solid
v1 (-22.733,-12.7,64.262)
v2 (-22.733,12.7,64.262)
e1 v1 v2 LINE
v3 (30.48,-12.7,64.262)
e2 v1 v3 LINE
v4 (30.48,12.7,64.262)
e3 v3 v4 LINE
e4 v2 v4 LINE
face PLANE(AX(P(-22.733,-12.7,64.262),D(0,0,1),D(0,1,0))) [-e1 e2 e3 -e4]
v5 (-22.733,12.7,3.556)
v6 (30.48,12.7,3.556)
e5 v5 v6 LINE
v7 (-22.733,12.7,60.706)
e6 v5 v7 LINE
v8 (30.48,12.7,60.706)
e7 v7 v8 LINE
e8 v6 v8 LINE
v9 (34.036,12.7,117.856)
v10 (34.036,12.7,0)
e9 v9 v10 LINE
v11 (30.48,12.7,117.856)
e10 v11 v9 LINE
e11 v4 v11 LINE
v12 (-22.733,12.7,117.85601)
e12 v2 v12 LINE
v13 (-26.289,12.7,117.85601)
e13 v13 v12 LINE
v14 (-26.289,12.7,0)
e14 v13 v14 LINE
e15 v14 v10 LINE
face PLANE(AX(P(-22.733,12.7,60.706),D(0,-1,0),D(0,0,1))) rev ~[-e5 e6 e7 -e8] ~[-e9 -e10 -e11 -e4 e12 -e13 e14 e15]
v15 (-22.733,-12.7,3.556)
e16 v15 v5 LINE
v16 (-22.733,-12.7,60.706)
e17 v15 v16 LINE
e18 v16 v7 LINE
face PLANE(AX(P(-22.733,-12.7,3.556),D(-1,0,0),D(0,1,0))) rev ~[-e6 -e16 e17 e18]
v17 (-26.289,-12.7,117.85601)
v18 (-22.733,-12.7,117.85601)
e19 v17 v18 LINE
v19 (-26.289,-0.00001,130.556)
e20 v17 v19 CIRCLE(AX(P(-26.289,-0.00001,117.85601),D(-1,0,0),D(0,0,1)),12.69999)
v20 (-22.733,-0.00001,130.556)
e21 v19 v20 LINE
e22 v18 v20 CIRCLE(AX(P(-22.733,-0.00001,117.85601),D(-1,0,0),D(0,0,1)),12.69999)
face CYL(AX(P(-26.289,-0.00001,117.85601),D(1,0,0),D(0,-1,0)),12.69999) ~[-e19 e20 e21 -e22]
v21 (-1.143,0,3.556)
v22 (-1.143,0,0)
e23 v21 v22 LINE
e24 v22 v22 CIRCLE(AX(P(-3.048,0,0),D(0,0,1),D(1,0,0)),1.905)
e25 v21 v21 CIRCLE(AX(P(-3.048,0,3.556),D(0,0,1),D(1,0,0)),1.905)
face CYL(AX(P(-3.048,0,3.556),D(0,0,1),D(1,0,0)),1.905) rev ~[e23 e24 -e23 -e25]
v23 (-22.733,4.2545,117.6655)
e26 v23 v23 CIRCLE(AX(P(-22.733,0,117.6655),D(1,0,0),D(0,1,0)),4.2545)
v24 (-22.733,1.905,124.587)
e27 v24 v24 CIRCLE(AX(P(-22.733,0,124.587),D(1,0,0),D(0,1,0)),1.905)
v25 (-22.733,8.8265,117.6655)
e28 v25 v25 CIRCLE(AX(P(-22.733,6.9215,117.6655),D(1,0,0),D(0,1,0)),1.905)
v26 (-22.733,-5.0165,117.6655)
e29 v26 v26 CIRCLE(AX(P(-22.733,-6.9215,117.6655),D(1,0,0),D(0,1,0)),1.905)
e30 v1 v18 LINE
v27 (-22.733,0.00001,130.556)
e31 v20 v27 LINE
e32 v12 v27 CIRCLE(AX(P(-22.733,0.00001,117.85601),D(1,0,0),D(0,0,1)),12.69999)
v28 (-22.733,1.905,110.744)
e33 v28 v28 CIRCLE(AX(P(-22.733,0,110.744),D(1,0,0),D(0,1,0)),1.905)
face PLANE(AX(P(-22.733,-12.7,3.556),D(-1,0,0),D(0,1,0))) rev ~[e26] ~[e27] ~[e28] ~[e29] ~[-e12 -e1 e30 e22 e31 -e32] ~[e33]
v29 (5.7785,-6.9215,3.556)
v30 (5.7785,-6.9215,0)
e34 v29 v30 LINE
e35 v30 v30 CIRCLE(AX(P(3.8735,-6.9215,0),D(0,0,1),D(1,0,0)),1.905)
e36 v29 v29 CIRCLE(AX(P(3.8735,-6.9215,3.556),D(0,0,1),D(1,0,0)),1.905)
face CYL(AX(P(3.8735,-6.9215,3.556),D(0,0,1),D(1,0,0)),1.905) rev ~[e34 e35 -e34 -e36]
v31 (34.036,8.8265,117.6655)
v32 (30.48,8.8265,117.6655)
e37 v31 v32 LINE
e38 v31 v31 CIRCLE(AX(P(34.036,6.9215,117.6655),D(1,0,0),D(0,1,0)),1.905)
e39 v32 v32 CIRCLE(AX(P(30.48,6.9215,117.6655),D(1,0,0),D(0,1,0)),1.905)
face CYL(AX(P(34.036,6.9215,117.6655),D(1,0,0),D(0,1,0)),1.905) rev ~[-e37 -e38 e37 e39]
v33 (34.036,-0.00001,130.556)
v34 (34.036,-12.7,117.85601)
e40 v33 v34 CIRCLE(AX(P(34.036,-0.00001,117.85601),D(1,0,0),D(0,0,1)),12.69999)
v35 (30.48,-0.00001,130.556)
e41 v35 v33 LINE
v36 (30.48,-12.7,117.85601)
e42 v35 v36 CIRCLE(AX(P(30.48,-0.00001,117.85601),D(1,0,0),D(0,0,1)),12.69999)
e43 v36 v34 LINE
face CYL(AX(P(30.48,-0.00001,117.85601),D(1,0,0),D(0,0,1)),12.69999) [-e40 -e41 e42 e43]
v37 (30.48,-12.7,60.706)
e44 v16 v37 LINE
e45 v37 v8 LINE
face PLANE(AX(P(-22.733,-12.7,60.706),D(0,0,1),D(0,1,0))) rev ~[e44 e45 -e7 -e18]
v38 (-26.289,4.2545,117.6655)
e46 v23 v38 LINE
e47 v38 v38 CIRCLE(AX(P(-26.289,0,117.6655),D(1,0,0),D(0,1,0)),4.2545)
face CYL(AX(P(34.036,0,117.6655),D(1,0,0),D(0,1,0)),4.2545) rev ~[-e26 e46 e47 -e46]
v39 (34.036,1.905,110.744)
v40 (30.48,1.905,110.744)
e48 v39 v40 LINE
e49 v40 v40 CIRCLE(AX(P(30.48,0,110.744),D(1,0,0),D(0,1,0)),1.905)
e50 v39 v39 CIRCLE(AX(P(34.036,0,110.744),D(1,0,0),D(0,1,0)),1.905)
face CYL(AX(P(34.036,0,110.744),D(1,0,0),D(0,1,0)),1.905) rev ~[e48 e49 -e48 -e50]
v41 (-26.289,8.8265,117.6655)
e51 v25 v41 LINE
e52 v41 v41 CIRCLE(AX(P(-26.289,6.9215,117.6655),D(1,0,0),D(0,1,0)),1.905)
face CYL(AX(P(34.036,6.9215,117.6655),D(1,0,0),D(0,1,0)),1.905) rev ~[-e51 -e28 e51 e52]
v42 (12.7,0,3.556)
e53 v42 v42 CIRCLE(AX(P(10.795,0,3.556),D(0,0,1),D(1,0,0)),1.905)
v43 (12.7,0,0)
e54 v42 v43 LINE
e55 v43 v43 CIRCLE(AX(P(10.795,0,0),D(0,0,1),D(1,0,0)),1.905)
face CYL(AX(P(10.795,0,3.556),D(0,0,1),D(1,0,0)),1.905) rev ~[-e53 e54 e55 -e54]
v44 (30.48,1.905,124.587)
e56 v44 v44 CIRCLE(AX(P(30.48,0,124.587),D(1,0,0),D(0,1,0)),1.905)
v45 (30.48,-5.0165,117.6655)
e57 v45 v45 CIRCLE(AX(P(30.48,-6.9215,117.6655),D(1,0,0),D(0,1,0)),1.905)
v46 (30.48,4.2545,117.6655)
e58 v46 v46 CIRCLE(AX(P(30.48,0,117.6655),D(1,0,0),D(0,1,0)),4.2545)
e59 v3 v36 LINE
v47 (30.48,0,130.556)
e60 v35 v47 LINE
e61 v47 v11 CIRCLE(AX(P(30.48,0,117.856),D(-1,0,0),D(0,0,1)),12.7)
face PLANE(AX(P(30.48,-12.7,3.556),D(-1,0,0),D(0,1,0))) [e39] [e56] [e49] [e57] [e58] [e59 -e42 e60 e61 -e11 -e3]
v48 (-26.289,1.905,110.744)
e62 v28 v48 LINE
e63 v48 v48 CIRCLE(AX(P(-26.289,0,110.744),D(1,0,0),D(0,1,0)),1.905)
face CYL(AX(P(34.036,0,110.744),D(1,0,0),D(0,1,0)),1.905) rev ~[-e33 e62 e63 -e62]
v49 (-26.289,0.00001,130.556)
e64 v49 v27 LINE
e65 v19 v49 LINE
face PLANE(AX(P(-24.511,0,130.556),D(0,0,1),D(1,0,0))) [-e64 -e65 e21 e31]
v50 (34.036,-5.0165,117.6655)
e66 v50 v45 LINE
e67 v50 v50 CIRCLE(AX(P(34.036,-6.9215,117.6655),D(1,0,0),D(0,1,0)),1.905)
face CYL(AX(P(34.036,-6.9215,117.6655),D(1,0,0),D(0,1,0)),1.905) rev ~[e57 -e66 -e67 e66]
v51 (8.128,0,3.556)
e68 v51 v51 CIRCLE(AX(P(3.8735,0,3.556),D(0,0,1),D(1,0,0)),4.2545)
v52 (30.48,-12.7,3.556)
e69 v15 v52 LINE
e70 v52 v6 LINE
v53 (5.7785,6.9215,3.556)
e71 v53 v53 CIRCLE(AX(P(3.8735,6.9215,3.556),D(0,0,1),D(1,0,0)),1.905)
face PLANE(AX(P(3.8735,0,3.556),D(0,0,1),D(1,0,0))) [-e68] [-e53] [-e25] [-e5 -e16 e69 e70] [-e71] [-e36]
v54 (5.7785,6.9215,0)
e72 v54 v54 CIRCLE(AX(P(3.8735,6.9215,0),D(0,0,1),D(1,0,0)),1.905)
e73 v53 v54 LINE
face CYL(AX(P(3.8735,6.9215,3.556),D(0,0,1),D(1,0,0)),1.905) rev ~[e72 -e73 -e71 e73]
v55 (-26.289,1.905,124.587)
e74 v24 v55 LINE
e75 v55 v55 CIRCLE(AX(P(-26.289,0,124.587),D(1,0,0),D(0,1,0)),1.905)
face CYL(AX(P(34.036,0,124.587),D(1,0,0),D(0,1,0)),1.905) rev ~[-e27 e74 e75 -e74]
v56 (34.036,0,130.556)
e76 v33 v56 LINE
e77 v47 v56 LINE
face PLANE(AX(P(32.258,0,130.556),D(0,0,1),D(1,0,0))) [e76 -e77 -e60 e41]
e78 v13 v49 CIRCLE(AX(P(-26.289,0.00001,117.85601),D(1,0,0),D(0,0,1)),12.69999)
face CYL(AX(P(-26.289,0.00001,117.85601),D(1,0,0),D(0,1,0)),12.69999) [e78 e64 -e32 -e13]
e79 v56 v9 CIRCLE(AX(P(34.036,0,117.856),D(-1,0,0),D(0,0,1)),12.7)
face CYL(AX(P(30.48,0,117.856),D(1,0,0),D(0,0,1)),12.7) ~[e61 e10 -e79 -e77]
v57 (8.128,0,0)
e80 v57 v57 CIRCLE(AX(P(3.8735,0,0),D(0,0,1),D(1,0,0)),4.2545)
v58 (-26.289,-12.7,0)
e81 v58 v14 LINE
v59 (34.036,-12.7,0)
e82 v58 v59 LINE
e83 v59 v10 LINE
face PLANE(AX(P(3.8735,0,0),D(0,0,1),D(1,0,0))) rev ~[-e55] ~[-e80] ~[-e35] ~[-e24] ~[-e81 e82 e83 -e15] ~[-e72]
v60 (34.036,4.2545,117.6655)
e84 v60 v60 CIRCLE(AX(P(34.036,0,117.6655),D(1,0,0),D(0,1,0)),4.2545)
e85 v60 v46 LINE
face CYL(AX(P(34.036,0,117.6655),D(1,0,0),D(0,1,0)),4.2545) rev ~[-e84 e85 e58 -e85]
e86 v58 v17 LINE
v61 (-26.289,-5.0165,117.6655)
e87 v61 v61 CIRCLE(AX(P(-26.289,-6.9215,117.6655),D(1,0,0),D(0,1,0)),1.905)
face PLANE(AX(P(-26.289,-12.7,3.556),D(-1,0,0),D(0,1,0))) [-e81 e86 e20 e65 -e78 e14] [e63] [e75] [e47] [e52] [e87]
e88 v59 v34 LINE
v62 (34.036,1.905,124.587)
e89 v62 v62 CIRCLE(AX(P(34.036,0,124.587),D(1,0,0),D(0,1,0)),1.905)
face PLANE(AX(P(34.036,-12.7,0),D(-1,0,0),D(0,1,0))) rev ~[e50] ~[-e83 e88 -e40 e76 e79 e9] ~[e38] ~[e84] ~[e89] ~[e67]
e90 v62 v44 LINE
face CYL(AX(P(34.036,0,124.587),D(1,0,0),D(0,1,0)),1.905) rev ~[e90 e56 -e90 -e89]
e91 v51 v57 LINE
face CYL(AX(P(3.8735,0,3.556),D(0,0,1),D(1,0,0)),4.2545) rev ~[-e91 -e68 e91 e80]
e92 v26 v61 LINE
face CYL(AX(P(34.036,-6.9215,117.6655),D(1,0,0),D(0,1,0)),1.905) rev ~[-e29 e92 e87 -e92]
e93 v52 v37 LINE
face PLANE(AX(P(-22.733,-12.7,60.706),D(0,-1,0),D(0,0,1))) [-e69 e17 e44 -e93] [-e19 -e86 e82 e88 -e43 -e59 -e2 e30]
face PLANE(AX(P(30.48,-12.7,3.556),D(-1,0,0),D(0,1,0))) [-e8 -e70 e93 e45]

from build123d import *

# Parameters (mm, degrees)
F0_W      = 60.325
F0_H      = 25.4
F1_DEPTH  = 3.556
F2_W      = 3.556
F2_H      = 25.4
F3_DEPTH  = 127
F4_R      = 12.7
F5_R      = 12.69999
F6_R      = 4.2545
F6_R_2    = 1.905
F7_DEPTH  = 254
F8_R      = 4.2545
F8_R_2    = 1.905
F9_DEPTH  = 25.4
F10_W     = 25.4
F10_H     = 3.556
F11_DEPTH = 53.34


# Not quite as in the source:
# - a fillet or chamfer is up to 0.001 mm smaller than in the source, because OpenCascade refuses the exact size


with BuildPart() as f1:
    # F0 (on Top) → F1 (new body)
    with BuildSketch(Plane.XY):
        with Locations((3.8735, 0)):
            Rectangle(F0_W, F0_H)
    extrude(amount=F1_DEPTH)

    # F2 (on face) → F3 (join)
    with BuildSketch(Plane.XY.offset(3.556)):
        with Locations((-24.511, 0)):
            Rectangle(F2_W, F2_H)
        with Locations((32.258, 0)):
            Rectangle(F2_W, F2_H)
    extrude(amount=F3_DEPTH)

    # F4
    f4_edges = [f1.edges().sort_by_distance(p)[0] for p in [
        (32.258, 12.7, 130.556),
    ]]
    fillet(f4_edges, radius=F4_R)

    # F5 (radius 12.7 in the source; OpenCascade refuses exactly that, so slightly less here)
    f5_edges = [f1.edges().sort_by_distance(p)[0] for p in [
        (32.258, -12.7, 130.556),
        (-24.511, -12.7, 130.556),
        (-24.511, 12.7, 130.556),
    ]]
    fillet(f5_edges, radius=F5_R)

    # F6 (on face) → F7 (cut)
    with BuildSketch(Plane.YZ.offset(34.036)):
        with Locations((0, 117.6655)):
            Circle(F6_R)
        with Locations((0, 124.587)):
            Circle(F6_R_2)
        with Locations((-6.9215, 117.6655)):
            Circle(F6_R_2)
        with Locations((0, 110.744)):
            Circle(F6_R_2)
        with Locations((6.9215, 117.6655)):
            Circle(F6_R_2)
    extrude(amount=-F7_DEPTH, mode=Mode.SUBTRACT)

    # F8 (on face) → F9 (cut)
    with BuildSketch(Plane.XY.offset(3.556)):
        with Locations((3.8735, 0)):
            Circle(F8_R)
        with Locations((-3.048, 0)):
            Circle(F8_R_2)
        with Locations((3.8735, 6.9215)):
            Circle(F8_R_2)
        with Locations((3.8735, -6.9215)):
            Circle(F8_R_2)
        with Locations((10.795, 0)):
            Circle(F8_R_2)
    extrude(amount=-F9_DEPTH, mode=Mode.SUBTRACT)

    # F10 (on face) → F11 (join)
    with BuildSketch(Plane.YZ.offset(-22.733)):
        with Locations((0, 62.484)):
            Rectangle(F10_W, F10_H)
    extrude(amount=F11_DEPTH)


solid = f1.part
